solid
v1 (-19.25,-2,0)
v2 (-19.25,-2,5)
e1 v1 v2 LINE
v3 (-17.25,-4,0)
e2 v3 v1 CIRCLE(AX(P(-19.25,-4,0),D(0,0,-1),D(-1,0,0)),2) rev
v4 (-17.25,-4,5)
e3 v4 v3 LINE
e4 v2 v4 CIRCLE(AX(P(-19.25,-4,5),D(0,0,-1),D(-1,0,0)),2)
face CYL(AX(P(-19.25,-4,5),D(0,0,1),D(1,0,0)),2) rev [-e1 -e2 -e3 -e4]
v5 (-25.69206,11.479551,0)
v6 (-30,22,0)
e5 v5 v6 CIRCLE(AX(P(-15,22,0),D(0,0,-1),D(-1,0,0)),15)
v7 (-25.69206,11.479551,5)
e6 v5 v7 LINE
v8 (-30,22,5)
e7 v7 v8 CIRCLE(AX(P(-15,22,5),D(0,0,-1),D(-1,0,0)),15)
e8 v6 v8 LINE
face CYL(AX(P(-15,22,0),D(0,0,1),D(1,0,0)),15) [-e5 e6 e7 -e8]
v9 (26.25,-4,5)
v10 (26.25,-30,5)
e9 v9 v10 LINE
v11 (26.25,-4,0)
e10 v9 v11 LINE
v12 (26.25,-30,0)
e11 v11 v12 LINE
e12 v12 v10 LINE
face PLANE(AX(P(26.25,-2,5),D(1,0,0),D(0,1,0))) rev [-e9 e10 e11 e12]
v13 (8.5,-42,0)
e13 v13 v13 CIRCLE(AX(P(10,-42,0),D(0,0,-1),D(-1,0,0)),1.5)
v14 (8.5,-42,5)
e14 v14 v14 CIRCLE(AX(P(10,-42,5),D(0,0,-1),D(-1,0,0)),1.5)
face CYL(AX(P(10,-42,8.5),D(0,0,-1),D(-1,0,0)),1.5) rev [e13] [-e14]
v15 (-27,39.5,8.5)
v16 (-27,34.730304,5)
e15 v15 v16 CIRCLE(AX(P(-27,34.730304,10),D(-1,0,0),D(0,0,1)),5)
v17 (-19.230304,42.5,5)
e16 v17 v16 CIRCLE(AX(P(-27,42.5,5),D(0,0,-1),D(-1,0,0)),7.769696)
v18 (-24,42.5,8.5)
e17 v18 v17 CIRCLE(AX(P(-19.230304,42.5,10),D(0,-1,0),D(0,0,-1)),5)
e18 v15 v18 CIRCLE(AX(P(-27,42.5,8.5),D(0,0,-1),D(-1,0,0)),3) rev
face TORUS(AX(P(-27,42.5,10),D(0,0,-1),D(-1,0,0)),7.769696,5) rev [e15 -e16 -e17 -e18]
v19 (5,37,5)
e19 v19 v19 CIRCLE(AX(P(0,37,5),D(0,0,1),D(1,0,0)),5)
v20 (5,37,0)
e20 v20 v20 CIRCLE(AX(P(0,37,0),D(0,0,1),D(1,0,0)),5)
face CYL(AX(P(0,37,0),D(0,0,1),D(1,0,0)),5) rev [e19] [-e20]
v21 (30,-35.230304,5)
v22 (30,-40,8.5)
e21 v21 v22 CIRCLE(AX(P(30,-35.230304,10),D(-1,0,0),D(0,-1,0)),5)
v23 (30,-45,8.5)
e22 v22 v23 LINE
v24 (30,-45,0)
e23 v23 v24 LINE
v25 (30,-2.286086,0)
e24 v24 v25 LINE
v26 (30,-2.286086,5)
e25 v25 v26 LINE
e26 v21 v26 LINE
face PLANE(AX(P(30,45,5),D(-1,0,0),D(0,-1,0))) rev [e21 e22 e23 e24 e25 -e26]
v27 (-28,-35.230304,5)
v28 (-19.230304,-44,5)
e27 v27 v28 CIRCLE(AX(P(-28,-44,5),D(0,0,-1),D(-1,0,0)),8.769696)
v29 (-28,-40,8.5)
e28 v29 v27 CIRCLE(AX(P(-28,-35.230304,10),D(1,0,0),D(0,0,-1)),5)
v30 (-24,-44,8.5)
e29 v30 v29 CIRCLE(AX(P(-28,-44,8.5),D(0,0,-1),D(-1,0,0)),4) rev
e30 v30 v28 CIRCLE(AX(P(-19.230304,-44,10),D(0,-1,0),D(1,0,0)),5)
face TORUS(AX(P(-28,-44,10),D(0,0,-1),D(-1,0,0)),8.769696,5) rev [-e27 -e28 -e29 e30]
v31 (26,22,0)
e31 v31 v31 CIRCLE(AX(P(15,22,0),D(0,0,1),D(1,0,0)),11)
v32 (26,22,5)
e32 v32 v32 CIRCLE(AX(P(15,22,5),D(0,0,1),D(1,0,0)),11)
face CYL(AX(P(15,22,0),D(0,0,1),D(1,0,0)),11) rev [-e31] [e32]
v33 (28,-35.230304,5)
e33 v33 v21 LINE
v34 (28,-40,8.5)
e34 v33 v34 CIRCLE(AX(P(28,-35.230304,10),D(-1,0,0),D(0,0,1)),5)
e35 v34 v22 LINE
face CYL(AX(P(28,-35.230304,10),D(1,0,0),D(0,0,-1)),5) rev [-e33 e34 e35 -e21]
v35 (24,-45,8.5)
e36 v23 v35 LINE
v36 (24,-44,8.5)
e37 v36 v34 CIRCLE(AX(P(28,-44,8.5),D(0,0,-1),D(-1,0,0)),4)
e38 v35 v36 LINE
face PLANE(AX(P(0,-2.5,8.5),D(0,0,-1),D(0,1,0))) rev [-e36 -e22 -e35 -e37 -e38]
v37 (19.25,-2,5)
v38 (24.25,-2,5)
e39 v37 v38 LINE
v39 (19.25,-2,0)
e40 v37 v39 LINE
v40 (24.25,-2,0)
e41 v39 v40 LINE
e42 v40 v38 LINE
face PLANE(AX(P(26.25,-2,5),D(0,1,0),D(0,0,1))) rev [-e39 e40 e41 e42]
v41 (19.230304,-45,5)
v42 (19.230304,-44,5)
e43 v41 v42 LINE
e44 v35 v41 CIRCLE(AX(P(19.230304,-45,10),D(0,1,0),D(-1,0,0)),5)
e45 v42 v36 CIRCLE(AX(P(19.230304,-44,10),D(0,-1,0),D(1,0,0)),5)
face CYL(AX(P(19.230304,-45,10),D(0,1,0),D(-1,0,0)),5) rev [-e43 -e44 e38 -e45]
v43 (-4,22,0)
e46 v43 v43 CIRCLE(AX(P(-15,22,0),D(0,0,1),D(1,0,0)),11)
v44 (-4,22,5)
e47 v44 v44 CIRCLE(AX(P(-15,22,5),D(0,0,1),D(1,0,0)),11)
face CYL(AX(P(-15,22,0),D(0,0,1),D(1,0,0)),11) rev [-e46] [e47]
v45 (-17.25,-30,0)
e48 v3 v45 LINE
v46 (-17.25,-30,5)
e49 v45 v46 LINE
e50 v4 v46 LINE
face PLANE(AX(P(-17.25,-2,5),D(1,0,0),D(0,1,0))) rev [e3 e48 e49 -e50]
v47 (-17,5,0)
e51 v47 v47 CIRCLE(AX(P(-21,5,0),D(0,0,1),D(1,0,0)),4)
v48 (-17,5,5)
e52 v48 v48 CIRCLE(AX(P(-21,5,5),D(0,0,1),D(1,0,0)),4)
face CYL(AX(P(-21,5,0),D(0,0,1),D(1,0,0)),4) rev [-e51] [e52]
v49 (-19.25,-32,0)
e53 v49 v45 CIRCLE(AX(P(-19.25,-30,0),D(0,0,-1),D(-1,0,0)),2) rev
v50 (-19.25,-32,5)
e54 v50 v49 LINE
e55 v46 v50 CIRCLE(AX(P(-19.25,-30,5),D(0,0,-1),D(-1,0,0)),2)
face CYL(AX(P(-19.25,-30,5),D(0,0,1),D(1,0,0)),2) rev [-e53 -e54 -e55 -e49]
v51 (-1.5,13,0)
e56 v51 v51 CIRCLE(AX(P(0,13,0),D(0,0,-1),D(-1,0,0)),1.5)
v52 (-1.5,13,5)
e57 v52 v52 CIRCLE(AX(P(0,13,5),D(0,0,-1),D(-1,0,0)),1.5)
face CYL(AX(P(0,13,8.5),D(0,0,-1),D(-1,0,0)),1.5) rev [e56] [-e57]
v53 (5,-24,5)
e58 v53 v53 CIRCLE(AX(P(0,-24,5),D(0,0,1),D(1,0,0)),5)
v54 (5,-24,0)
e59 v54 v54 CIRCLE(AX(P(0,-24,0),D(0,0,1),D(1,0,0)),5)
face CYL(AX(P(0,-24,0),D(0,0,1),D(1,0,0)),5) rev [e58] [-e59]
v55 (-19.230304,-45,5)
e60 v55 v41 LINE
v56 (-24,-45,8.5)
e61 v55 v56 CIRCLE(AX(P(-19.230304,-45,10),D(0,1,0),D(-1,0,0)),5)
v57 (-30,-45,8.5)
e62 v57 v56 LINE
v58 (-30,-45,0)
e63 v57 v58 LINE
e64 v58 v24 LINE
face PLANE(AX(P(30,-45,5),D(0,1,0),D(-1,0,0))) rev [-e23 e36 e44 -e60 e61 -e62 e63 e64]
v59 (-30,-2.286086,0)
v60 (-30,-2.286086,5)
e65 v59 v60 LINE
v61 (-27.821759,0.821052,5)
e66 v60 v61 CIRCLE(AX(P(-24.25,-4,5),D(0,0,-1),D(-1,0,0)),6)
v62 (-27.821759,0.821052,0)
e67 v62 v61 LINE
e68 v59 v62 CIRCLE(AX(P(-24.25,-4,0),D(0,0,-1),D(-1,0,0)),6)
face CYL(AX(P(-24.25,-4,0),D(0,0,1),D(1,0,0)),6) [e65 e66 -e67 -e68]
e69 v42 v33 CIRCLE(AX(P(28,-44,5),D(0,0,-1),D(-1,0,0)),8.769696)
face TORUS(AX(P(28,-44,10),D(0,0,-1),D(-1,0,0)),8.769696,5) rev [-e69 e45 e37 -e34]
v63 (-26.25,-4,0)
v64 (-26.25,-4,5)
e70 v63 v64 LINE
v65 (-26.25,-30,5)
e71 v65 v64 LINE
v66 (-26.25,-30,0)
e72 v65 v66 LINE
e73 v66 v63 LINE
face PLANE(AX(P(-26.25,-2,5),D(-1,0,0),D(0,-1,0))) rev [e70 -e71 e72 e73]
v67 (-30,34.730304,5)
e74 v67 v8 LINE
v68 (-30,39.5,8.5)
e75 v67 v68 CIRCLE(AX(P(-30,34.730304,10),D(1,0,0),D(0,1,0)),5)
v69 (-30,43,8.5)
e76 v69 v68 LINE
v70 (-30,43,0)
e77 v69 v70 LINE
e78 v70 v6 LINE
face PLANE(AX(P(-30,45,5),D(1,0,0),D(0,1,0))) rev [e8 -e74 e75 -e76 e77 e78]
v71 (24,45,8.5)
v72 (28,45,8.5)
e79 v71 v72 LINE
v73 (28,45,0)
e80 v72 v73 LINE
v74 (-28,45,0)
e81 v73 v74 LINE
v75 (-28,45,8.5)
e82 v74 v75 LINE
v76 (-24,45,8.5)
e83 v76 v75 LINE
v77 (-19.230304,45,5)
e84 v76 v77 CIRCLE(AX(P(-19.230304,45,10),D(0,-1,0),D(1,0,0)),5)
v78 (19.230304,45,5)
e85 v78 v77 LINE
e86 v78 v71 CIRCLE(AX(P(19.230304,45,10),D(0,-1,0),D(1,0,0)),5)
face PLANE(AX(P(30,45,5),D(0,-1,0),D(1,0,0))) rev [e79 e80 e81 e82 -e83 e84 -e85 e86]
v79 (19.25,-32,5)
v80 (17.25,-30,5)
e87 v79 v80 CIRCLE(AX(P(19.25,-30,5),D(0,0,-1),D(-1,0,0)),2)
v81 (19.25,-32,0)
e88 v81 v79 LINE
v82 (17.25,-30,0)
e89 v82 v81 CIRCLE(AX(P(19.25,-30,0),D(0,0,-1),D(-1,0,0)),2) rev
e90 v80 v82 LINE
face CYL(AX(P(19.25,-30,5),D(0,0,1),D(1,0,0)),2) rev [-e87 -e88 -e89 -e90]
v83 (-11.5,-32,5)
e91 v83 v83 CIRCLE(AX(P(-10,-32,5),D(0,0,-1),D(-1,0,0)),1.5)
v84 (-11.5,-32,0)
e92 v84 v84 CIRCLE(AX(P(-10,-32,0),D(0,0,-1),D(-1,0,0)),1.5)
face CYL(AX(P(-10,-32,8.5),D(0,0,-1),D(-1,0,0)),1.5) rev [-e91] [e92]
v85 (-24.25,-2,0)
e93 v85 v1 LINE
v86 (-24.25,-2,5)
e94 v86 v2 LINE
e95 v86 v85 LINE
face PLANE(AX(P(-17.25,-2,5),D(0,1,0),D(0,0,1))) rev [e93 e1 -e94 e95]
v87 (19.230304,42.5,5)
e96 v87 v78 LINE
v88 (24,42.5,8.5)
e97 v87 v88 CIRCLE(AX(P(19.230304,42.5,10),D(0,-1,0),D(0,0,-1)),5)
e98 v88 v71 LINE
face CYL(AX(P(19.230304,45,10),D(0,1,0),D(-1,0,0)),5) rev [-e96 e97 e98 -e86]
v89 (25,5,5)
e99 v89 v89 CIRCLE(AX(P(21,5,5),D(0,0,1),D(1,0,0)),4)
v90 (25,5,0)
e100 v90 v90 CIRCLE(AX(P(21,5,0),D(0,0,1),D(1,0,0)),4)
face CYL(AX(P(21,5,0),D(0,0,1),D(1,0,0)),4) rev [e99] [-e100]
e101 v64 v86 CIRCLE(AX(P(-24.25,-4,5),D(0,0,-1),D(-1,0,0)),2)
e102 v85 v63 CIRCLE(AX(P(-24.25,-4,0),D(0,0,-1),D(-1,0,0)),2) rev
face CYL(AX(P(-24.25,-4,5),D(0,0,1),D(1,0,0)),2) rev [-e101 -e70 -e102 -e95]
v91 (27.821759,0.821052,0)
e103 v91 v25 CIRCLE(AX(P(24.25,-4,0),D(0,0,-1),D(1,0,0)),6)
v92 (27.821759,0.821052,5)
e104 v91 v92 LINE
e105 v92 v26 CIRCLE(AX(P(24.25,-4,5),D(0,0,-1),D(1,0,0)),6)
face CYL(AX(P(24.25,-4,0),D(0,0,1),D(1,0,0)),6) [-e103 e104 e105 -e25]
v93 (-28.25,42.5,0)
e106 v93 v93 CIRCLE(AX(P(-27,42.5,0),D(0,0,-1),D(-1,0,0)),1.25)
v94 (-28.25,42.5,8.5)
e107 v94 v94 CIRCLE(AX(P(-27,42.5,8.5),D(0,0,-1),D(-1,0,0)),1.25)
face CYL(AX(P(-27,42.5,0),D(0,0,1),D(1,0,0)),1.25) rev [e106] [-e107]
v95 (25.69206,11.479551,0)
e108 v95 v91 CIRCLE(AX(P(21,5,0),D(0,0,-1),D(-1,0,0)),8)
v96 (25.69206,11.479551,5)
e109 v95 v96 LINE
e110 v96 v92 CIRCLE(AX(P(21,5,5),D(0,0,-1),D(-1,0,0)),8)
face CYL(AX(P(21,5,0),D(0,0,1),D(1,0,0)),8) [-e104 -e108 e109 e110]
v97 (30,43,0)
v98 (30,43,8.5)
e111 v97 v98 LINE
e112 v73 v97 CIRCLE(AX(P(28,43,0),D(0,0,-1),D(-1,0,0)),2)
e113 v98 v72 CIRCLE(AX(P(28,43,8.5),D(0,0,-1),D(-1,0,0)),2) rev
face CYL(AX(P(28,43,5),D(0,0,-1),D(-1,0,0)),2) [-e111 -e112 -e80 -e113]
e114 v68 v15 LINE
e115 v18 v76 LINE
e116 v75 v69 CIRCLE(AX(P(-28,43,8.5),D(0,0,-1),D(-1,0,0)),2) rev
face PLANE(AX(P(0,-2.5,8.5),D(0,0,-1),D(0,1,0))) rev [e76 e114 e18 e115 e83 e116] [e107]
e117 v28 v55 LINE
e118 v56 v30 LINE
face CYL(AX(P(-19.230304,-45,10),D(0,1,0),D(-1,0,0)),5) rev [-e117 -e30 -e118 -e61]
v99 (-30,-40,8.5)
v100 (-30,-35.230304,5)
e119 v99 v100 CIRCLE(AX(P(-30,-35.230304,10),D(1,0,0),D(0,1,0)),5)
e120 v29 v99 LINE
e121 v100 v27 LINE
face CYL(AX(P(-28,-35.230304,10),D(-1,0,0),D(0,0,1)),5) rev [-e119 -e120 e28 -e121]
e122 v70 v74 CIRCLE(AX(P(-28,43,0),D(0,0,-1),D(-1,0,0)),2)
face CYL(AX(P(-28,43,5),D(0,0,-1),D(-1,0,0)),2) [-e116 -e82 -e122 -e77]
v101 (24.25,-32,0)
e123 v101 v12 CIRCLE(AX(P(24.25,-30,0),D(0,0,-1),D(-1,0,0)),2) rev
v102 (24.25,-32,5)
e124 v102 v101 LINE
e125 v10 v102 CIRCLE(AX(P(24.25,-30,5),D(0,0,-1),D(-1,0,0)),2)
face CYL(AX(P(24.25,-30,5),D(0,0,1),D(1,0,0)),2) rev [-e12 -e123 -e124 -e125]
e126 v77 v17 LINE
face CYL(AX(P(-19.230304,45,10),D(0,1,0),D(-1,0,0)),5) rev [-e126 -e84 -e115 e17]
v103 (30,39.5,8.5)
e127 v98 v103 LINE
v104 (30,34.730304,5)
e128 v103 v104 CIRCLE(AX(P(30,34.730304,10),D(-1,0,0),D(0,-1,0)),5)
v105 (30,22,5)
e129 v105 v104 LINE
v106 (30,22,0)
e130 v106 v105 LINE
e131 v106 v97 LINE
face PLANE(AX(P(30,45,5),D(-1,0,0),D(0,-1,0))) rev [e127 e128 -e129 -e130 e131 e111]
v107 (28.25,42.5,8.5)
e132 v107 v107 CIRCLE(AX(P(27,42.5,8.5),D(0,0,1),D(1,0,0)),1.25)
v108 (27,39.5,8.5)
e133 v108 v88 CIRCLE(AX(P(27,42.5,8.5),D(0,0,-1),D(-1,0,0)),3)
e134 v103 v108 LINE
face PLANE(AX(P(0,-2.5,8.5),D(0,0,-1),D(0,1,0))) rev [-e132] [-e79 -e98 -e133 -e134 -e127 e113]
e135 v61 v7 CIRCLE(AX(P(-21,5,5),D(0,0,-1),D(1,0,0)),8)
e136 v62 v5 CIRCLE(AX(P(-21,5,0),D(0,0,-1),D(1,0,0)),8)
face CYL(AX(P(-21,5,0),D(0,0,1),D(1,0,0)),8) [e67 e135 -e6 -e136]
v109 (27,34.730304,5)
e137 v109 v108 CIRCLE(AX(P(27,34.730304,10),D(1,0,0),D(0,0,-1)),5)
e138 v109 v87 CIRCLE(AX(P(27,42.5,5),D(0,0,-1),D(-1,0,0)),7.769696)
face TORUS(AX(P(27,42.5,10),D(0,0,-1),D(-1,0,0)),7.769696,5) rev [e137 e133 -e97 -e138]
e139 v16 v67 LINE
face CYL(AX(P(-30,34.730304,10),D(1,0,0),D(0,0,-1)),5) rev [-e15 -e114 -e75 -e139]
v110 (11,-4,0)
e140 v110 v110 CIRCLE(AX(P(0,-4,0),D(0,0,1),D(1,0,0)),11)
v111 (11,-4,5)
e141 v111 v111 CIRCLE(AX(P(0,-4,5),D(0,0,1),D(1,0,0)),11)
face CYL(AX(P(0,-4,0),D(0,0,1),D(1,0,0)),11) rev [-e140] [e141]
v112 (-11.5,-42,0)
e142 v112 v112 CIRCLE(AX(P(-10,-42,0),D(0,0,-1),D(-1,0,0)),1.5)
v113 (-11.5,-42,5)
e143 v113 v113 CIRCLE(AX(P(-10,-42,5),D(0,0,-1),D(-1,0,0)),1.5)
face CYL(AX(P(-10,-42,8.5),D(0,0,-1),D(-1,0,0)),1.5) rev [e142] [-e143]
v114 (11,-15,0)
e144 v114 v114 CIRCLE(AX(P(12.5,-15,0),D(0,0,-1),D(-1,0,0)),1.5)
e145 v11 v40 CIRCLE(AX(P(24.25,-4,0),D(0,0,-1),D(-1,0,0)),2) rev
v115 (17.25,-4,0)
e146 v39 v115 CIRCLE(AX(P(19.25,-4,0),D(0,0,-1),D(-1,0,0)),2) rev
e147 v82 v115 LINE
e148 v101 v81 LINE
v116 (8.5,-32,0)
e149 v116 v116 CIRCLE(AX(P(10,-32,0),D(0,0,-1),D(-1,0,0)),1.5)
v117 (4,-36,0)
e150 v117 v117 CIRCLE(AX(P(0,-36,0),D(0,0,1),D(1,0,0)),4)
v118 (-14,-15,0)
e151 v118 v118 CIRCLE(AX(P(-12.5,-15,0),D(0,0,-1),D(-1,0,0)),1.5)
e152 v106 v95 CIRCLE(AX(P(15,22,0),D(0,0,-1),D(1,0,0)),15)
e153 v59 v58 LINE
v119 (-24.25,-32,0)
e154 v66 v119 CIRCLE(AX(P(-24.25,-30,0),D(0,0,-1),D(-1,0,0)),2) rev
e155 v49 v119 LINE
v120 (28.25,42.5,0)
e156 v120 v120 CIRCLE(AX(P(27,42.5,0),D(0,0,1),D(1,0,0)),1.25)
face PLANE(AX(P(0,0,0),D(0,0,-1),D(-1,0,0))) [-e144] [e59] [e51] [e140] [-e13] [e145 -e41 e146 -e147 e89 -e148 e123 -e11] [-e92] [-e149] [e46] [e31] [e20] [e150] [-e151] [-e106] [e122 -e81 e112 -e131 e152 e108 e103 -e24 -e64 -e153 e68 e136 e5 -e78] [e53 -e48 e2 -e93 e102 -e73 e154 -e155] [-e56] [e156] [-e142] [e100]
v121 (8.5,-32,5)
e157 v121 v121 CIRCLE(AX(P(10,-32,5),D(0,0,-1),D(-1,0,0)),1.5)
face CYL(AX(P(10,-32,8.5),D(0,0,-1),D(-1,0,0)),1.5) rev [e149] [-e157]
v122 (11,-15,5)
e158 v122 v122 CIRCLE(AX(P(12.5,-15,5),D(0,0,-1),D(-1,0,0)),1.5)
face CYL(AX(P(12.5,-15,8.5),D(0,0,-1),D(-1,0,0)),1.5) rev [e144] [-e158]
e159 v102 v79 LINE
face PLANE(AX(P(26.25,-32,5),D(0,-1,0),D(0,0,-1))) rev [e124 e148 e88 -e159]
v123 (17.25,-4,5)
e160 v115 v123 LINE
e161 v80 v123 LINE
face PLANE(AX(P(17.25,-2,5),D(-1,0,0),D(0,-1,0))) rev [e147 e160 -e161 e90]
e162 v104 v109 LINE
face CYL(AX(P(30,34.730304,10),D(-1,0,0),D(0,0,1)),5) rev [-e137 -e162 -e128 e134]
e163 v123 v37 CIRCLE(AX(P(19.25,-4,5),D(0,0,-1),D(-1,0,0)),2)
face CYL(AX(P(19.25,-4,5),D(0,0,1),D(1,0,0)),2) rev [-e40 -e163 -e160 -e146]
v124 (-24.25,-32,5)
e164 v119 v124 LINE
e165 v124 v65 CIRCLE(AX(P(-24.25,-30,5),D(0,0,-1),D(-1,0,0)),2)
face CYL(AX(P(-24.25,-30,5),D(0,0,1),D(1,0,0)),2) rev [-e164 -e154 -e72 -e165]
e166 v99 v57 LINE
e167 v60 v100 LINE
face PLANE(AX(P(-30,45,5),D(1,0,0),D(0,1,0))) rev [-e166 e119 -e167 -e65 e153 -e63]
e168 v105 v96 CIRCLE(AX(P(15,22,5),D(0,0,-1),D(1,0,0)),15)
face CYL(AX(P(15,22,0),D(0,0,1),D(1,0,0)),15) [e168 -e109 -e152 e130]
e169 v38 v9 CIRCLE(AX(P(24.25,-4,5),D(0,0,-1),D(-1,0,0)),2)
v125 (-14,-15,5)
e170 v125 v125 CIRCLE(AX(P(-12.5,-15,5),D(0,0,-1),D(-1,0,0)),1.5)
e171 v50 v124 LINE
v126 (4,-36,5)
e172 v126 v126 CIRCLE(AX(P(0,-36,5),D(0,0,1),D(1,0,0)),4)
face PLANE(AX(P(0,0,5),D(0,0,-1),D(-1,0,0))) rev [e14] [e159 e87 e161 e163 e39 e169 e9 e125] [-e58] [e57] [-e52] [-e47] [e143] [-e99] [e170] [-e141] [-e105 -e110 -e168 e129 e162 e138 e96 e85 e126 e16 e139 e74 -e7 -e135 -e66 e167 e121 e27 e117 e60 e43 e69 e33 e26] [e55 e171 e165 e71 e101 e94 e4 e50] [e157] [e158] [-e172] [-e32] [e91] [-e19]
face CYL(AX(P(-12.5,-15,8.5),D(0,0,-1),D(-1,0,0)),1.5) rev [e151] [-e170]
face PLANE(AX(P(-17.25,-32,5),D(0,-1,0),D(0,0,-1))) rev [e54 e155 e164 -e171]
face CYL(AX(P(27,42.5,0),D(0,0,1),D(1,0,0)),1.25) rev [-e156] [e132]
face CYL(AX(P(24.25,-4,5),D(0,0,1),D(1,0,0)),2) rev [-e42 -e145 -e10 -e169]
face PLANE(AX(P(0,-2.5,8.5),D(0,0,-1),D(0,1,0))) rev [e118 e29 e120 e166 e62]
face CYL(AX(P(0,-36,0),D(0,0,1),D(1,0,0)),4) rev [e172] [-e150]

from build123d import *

# Parameters (mm, degrees)
SKETCH1_W            = 60
SKETCH1_H            = 90
BOSS_EXTRUDE1_DEPTH  = 5
SKETCH2_W            = 9
SKETCH2_H            = 30
CUT_EXTRUDE1_DEPTH   = 55.313902456
FILLET1_R            = 2
BOSS_EXTRUDE2_DEPTH  = 3.5
FILLET2_R            = 5
FILLET2_OF_MIRROR1_R = 5
BOSS_EXTRUDE3_DEPTH  = 3.5
SKETCH5_R            = 1.25
CUT_EXTRUDE2_DEPTH   = 55.747146044
FILLET3_R            = 5
FILLET3_OF_MIRROR4_R = 5
FILLET4_R            = 2
SKETCH6_R            = 1.5
CUT_EXTRUDE3_DEPTH   = 55.747146044
SKETCH7_R            = 11
SKETCH7_R_2          = 5
SKETCH7_R_3          = 4
CUT_EXTRUDE4_DEPTH   = 55.313902456


with BuildPart() as part:
    # Sketch1 → Boss-Extrude1 (new body)
    with BuildSketch(Plane.XY):
        Rectangle(SKETCH1_W, SKETCH1_H)
    extrude(amount=BOSS_EXTRUDE1_DEPTH)

    # Sketch2 → Cut-Extrude1 (cut, through all)
    with BuildSketch(Plane(origin=(0, 0, 0), x_dir=(-1, 0, 0), z_dir=(0, 0, -1))):
        with Locations((-21.75, -17)):
            Rectangle(SKETCH2_W, SKETCH2_H)
        with Locations((21.75, -17)):
            Rectangle(SKETCH2_W, SKETCH2_H)
    extrude(amount=-CUT_EXTRUDE1_DEPTH, mode=Mode.SUBTRACT)

    # Fillet1
    fillet1_edges = [part.edges().sort_by_distance(p)[0] for p in [
        (26.25, -32, 2.5),
        (26.25, -2, 2.5),
        (17.25, -2, 2.5),
        (17.25, -32, 2.5),
        (-17.25, -32, 2.5),
        (-17.25, -2, 2.5),
        (-26.25, -2, 2.5),
        (-26.25, -32, 2.5),
    ]]
    fillet(fillet1_edges, radius=FILLET1_R)

    # Sketch3 → Boss-Extrude2 (add)
    with BuildSketch(Plane.XY.offset(5)):
        with BuildLine():
            Line((28, -40), (30, -40))
            Line((30, -40), (30, -45))
            Line((30, -45), (24, -45))
            Line((24, -45), (24, -44))
            ThreePointArc((24, -44), (25.171572875, -41.171572875), (28, -40))
        make_face()
    boss_extrude2 = extrude(amount=BOSS_EXTRUDE2_DEPTH)

    # Fillet2
    # the kernel refuses this fillet: 5 mm, written as the material it adds along each edge
    with BuildSketch(Plane(origin=(28, -40, 5), x_dir=(0, 1, 0), z_dir=(1, 0, 0))) as fillet2_piece_1:
        with BuildLine():
            CenterArc((4.769696007, 5), FILLET2_R, 197.457603124, 72.542396876)
            Line((0, 3.5), (-0.09539392, 3.47))
            ThreePointArc((-0.09539392, 3.47), (-0.1, 1.75), (-0.1, 0))
            Line((-0.1, 0), (0, -0.1))
            Line((0, -0.1), (4.769696007, -0.1))
            Line((4.769696007, -0.1), (4.769696007, 0))
        make_face()
    extrude(amount=2)
    with BuildSketch(Plane(origin=(24, -45, 5), x_dir=(-1, 0, 0), z_dir=(0, 1, 0))) as fillet2_piece_2:
        with BuildLine():
            CenterArc((4.769696007, 5), FILLET2_R, 197.457603124, 72.542396876)
            Line((0, 3.5), (-0.09539392, 3.47))
            ThreePointArc((-0.09539392, 3.47), (-0.1, 1.75), (-0.1, 0))
            Line((-0.1, 0), (0, -0.1))
            Line((0, -0.1), (4.769696007, -0.1))
            Line((4.769696007, -0.1), (4.769696007, 0))
        make_face()
    extrude(amount=1)
    with BuildSketch(Plane(origin=(28, -44, 5), x_dir=(-1, 0, 0), z_dir=(0, -1, 0))) as fillet2_piece_3:
        with BuildLine():
            CenterArc((8.769696007, -5), FILLET2_R, 90, 72.542396876)
            Line((4, -3.5), (3.90460608, -3.47))
            ThreePointArc((3.90460608, -3.47), (3.9, -1.75), (3.9, 0))
            Line((3.9, 0), (4, 0.1))
            Line((4, 0.1), (8.769696007, 0.1))
            Line((8.769696007, 0.1), (8.769696007, 0))
        make_face()
    revolve(axis=Axis((28, -44, 5), (0, 0, -1)), revolution_arc=90)

    # Mirror1: Boss-Extrude2 across plane
    add(boss_extrude2.mirror(Plane(origin=(0, 0, 0), x_dir=(0, 0, 1), z_dir=(1, 0, 0))))

    # Fillet2 of Mirror1
    # the kernel refuses this fillet: 5 mm, written as the material it adds along each edge
    with BuildSketch(Plane(origin=(-28, -40, 5), x_dir=(0, 0, 1), z_dir=(-1, 0, 0))) as fillet2_of_mirror1_piece_1:
        with BuildLine():
            CenterArc((5, 4.769696007), FILLET2_OF_MIRROR1_R, 180, 72.542396876)
            Line((0, 4.769696007), (-0.1, 4.769696007))
            Line((-0.1, 4.769696007), (-0.1, 0))
            Line((-0.1, 0), (0, -0.1))
            ThreePointArc((0, -0.1), (1.75, -0.1), (3.47, -0.09539392))
            Line((3.47, -0.09539392), (3.5, 0))
        make_face()
    extrude(amount=2)
    with BuildSketch(Plane(origin=(-24, -45, 5), x_dir=(0, 0, 1), z_dir=(0, 1, 0))) as fillet2_of_mirror1_piece_2:
        with BuildLine():
            CenterArc((5, 4.769696007), FILLET2_OF_MIRROR1_R, 180, 72.542396876)
            Line((0, 4.769696007), (-0.1, 4.769696007))
            Line((-0.1, 4.769696007), (-0.1, 0))
            Line((-0.1, 0), (0, -0.1))
            ThreePointArc((0, -0.1), (1.75, -0.1), (3.47, -0.09539392))
            Line((3.47, -0.09539392), (3.5, 0))
        make_face()
    extrude(amount=1)
    with BuildSketch(Plane(origin=(-28, -44, 5), x_dir=(1, 0, 0), z_dir=(0, -1, 0))) as fillet2_of_mirror1_piece_3:
        with BuildLine():
            CenterArc((8.769696007, 5), FILLET2_OF_MIRROR1_R, 197.457603124, 72.542396876)
            Line((8.769696007, 0), (8.769696007, -0.1))
            Line((8.769696007, -0.1), (4, -0.1))
            Line((4, -0.1), (3.9, 0))
            ThreePointArc((3.9, 0), (3.9, 1.75), (3.90460608, 3.47))
            Line((3.90460608, 3.47), (4, 3.5))
        make_face()
    revolve(axis=Axis((-28, -44, 5), (0, 0, 1)), revolution_arc=90)

    # Sketch4 → Boss-Extrude3 (add)
    with BuildSketch(Plane.XY.offset(5)):
        with BuildLine():
            Line((24, 45), (24, 42.5))
            ThreePointArc((24, 42.5), (24.878679656, 40.378679656), (27, 39.5))
            Line((27, 39.5), (30, 39.5))
            Line((30, 39.5), (30, 45))
            Line((30, 45), (24, 45))
        make_face()
    boss_extrude3 = extrude(amount=BOSS_EXTRUDE3_DEPTH)

    # Sketch5 → Cut-Extrude2 (cut, through all)
    with BuildSketch(Plane.XY.offset(8.5)):
        with Locations((27, 42.5)):
            Circle(SKETCH5_R)
    cut_extrude2 = extrude(amount=-CUT_EXTRUDE2_DEPTH, mode=Mode.SUBTRACT)

    # Fillet3
    # the kernel refuses this fillet: 5 mm, written as the material it adds along each edge
    with BuildSketch(Plane(origin=(24, 45, 5), x_dir=(-1, 0, 0), z_dir=(0, -1, 0))) as fillet3_piece_1:
        with BuildLine():
            CenterArc((4.769696007, -5), FILLET3_R, 90, 72.542396876)
            Line((0, -3.5), (-0.09539392, -3.47))
            ThreePointArc((-0.09539392, -3.47), (-0.1, -1.75), (-0.1, 0))
            Line((-0.1, 0), (0, 0.1))
            Line((0, 0.1), (4.769696007, 0.1))
            Line((4.769696007, 0.1), (4.769696007, 0))
        make_face()
    extrude(amount=2.5)
    with BuildSketch(Plane(origin=(27, 42.5, 5), x_dir=(-1, 0, 0), z_dir=(0, 1, 0))) as fillet3_piece_2:
        with BuildLine():
            CenterArc((7.769696007, 5), FILLET3_R, 197.457603124, 72.542396876)
            Line((3, 3.5), (2.90460608, 3.47))
            ThreePointArc((2.90460608, 3.47), (2.9, 1.75), (2.9, 0))
            Line((2.9, 0), (3, -0.1))
            Line((3, -0.1), (7.769696007, -0.1))
            Line((7.769696007, -0.1), (7.769696007, 0))
        make_face()
    revolve(axis=Axis((27, 42.5, 5), (0, 0, 1)), revolution_arc=90)
    with BuildSketch(Plane(origin=(27, 39.5, 5), x_dir=(0, -1, 0), z_dir=(1, 0, 0))) as fillet3_piece_3:
        with BuildLine():
            CenterArc((4.769696007, -5), FILLET3_R, 90, 72.542396876)
            Line((0, -3.5), (-0.09539392, -3.47))
            ThreePointArc((-0.09539392, -3.47), (-0.1, -1.75), (-0.1, 0))
            Line((-0.1, 0), (0, 0.1))
            Line((0, 0.1), (4.769696007, 0.1))
            Line((4.769696007, 0.1), (4.769696007, 0))
        make_face()
    extrude(amount=3)

    # Mirror4: Boss-Extrude3, Cut-Extrude2 across plane
    add(boss_extrude3.mirror(Plane(origin=(0, 0, 0), x_dir=(0, 0, 1), z_dir=(1, 0, 0))))
    add(cut_extrude2.mirror(Plane(origin=(0, 0, 0), x_dir=(0, 0, 1), z_dir=(1, 0, 0))), mode=Mode.SUBTRACT)

    # Fillet3 of Mirror4
    # the kernel refuses this fillet: 5 mm, written as the material it adds along each edge
    with BuildSketch(Plane(origin=(-24, 45, 5), x_dir=(1, 0, 0), z_dir=(0, -1, 0))) as fillet3_of_mirror4_piece_1:
        with BuildLine():
            CenterArc((4.769696007, 5), FILLET3_OF_MIRROR4_R, 197.457603124, 72.542396876)
            Line((0, 3.5), (-0.09539392, 3.47))
            ThreePointArc((-0.09539392, 3.47), (-0.1, 1.75), (-0.1, 0))
            Line((-0.1, 0), (0, -0.1))
            Line((0, -0.1), (4.769696007, -0.1))
            Line((4.769696007, -0.1), (4.769696007, 0))
        make_face()
    extrude(amount=2.5)
    with BuildSketch(Plane(origin=(-27, 42.5, 5), x_dir=(1, 0, 0), z_dir=(0, 1, 0))) as fillet3_of_mirror4_piece_2:
        with BuildLine():
            CenterArc((7.769696007, -5), FILLET3_OF_MIRROR4_R, 90, 72.542396876)
            Line((3, -3.5), (2.90460608, -3.47))
            ThreePointArc((2.90460608, -3.47), (2.9, -1.75), (2.9, 0))
            Line((2.9, 0), (3, 0.1))
            Line((3, 0.1), (7.769696007, 0.1))
            Line((7.769696007, 0.1), (7.769696007, 0))
        make_face()
    revolve(axis=Axis((-27, 42.5, 5), (0, 0, -1)), revolution_arc=90)
    with BuildSketch(Plane(origin=(-27, 39.5, 5), x_dir=(0, -1, 0), z_dir=(-1, 0, 0))) as fillet3_of_mirror4_piece_3:
        with BuildLine():
            CenterArc((4.769696007, 5), FILLET3_OF_MIRROR4_R, 197.457603124, 72.542396876)
            Line((0, 3.5), (-0.09539392, 3.47))
            ThreePointArc((-0.09539392, 3.47), (-0.1, 1.75), (-0.1, 0))
            Line((-0.1, 0), (0, -0.1))
            Line((0, -0.1), (4.769696007, -0.1))
            Line((4.769696007, -0.1), (4.769696007, 0))
        make_face()
    extrude(amount=3)

    # Fillet4
    fillet4_edges = [part.edges().sort_by_distance(p)[0] for p in [
        (-30, 45, 4.25),
        (30, 45, 4.25),
    ]]
    fillet(fillet4_edges, radius=FILLET4_R)

    # Sketch6 → Cut-Extrude3 (cut, through all)
    with BuildSketch(Plane(origin=(0, 0, 0), x_dir=(-1, 0, 0), z_dir=(0, 0, -1))):
        with Locations((-10, -32)):
            Circle(SKETCH6_R)
        with Locations((-10, -42)):
            Circle(SKETCH6_R)
        with Locations((10, -42)):
            Circle(SKETCH6_R)
        with Locations((10, -32)):
            Circle(SKETCH6_R)
        with Locations((0, 13)):
            Circle(SKETCH6_R)
        with Locations((12.5, -15)):
            Circle(SKETCH6_R)
        with Locations((-12.5, -15)):
            Circle(SKETCH6_R)
    extrude(amount=-CUT_EXTRUDE3_DEPTH, mode=Mode.SUBTRACT)

    # Sketch7 → Cut-Extrude4 (cut, through all)
    with BuildSketch(Plane.XY.offset(5)):
        with Locations((-15, 22)):
            Circle(SKETCH7_R)
        with Locations((15, 22)):
            Circle(SKETCH7_R)
        with Locations((0, -4)):
            Circle(SKETCH7_R)
        with Locations((0, -24)):
            Circle(SKETCH7_R_2)
        with Locations((0, -36)):
            Circle(SKETCH7_R_3)
        with Locations((0, 37)):
            Circle(SKETCH7_R_2)
        with Locations((-21, 5)):
            Circle(SKETCH7_R_3)
        with Locations((21, 5)):
            Circle(SKETCH7_R_3)
        with BuildLine():
            Line((30, 22), (30, 5))
            Line((30, 5), (30, -2.28608635))
            ThreePointArc((30, -2.28608635), (29.162980054, -0.555783544), (27.82175868, 0.821051746))
            ThreePointArc((27.82175868, 0.821051746), (28.844928487, 6.567513007), (25.692059794, 11.479550516))
            ThreePointArc((25.692059794, 11.479550516), (28.881298515, 16.315850852), (30, 22))
        make_face()
        with BuildLine():
            Line((-30, 5), (-30, -2.28608635))
            ThreePointArc((-30, -2.28608635), (-29.162980054, -0.555783544), (-27.82175868, 0.821051746))
            ThreePointArc((-27.82175868, 0.821051746), (-28.844928487, 6.567513007), (-25.692059794, 11.479550516))
            ThreePointArc((-25.692059794, 11.479550516), (-28.881298515, 16.315850852), (-30, 22))
            Line((-30, 22), (-30, 5))
        make_face()
    extrude(amount=-CUT_EXTRUDE4_DEPTH, mode=Mode.SUBTRACT)


solid = part.part
